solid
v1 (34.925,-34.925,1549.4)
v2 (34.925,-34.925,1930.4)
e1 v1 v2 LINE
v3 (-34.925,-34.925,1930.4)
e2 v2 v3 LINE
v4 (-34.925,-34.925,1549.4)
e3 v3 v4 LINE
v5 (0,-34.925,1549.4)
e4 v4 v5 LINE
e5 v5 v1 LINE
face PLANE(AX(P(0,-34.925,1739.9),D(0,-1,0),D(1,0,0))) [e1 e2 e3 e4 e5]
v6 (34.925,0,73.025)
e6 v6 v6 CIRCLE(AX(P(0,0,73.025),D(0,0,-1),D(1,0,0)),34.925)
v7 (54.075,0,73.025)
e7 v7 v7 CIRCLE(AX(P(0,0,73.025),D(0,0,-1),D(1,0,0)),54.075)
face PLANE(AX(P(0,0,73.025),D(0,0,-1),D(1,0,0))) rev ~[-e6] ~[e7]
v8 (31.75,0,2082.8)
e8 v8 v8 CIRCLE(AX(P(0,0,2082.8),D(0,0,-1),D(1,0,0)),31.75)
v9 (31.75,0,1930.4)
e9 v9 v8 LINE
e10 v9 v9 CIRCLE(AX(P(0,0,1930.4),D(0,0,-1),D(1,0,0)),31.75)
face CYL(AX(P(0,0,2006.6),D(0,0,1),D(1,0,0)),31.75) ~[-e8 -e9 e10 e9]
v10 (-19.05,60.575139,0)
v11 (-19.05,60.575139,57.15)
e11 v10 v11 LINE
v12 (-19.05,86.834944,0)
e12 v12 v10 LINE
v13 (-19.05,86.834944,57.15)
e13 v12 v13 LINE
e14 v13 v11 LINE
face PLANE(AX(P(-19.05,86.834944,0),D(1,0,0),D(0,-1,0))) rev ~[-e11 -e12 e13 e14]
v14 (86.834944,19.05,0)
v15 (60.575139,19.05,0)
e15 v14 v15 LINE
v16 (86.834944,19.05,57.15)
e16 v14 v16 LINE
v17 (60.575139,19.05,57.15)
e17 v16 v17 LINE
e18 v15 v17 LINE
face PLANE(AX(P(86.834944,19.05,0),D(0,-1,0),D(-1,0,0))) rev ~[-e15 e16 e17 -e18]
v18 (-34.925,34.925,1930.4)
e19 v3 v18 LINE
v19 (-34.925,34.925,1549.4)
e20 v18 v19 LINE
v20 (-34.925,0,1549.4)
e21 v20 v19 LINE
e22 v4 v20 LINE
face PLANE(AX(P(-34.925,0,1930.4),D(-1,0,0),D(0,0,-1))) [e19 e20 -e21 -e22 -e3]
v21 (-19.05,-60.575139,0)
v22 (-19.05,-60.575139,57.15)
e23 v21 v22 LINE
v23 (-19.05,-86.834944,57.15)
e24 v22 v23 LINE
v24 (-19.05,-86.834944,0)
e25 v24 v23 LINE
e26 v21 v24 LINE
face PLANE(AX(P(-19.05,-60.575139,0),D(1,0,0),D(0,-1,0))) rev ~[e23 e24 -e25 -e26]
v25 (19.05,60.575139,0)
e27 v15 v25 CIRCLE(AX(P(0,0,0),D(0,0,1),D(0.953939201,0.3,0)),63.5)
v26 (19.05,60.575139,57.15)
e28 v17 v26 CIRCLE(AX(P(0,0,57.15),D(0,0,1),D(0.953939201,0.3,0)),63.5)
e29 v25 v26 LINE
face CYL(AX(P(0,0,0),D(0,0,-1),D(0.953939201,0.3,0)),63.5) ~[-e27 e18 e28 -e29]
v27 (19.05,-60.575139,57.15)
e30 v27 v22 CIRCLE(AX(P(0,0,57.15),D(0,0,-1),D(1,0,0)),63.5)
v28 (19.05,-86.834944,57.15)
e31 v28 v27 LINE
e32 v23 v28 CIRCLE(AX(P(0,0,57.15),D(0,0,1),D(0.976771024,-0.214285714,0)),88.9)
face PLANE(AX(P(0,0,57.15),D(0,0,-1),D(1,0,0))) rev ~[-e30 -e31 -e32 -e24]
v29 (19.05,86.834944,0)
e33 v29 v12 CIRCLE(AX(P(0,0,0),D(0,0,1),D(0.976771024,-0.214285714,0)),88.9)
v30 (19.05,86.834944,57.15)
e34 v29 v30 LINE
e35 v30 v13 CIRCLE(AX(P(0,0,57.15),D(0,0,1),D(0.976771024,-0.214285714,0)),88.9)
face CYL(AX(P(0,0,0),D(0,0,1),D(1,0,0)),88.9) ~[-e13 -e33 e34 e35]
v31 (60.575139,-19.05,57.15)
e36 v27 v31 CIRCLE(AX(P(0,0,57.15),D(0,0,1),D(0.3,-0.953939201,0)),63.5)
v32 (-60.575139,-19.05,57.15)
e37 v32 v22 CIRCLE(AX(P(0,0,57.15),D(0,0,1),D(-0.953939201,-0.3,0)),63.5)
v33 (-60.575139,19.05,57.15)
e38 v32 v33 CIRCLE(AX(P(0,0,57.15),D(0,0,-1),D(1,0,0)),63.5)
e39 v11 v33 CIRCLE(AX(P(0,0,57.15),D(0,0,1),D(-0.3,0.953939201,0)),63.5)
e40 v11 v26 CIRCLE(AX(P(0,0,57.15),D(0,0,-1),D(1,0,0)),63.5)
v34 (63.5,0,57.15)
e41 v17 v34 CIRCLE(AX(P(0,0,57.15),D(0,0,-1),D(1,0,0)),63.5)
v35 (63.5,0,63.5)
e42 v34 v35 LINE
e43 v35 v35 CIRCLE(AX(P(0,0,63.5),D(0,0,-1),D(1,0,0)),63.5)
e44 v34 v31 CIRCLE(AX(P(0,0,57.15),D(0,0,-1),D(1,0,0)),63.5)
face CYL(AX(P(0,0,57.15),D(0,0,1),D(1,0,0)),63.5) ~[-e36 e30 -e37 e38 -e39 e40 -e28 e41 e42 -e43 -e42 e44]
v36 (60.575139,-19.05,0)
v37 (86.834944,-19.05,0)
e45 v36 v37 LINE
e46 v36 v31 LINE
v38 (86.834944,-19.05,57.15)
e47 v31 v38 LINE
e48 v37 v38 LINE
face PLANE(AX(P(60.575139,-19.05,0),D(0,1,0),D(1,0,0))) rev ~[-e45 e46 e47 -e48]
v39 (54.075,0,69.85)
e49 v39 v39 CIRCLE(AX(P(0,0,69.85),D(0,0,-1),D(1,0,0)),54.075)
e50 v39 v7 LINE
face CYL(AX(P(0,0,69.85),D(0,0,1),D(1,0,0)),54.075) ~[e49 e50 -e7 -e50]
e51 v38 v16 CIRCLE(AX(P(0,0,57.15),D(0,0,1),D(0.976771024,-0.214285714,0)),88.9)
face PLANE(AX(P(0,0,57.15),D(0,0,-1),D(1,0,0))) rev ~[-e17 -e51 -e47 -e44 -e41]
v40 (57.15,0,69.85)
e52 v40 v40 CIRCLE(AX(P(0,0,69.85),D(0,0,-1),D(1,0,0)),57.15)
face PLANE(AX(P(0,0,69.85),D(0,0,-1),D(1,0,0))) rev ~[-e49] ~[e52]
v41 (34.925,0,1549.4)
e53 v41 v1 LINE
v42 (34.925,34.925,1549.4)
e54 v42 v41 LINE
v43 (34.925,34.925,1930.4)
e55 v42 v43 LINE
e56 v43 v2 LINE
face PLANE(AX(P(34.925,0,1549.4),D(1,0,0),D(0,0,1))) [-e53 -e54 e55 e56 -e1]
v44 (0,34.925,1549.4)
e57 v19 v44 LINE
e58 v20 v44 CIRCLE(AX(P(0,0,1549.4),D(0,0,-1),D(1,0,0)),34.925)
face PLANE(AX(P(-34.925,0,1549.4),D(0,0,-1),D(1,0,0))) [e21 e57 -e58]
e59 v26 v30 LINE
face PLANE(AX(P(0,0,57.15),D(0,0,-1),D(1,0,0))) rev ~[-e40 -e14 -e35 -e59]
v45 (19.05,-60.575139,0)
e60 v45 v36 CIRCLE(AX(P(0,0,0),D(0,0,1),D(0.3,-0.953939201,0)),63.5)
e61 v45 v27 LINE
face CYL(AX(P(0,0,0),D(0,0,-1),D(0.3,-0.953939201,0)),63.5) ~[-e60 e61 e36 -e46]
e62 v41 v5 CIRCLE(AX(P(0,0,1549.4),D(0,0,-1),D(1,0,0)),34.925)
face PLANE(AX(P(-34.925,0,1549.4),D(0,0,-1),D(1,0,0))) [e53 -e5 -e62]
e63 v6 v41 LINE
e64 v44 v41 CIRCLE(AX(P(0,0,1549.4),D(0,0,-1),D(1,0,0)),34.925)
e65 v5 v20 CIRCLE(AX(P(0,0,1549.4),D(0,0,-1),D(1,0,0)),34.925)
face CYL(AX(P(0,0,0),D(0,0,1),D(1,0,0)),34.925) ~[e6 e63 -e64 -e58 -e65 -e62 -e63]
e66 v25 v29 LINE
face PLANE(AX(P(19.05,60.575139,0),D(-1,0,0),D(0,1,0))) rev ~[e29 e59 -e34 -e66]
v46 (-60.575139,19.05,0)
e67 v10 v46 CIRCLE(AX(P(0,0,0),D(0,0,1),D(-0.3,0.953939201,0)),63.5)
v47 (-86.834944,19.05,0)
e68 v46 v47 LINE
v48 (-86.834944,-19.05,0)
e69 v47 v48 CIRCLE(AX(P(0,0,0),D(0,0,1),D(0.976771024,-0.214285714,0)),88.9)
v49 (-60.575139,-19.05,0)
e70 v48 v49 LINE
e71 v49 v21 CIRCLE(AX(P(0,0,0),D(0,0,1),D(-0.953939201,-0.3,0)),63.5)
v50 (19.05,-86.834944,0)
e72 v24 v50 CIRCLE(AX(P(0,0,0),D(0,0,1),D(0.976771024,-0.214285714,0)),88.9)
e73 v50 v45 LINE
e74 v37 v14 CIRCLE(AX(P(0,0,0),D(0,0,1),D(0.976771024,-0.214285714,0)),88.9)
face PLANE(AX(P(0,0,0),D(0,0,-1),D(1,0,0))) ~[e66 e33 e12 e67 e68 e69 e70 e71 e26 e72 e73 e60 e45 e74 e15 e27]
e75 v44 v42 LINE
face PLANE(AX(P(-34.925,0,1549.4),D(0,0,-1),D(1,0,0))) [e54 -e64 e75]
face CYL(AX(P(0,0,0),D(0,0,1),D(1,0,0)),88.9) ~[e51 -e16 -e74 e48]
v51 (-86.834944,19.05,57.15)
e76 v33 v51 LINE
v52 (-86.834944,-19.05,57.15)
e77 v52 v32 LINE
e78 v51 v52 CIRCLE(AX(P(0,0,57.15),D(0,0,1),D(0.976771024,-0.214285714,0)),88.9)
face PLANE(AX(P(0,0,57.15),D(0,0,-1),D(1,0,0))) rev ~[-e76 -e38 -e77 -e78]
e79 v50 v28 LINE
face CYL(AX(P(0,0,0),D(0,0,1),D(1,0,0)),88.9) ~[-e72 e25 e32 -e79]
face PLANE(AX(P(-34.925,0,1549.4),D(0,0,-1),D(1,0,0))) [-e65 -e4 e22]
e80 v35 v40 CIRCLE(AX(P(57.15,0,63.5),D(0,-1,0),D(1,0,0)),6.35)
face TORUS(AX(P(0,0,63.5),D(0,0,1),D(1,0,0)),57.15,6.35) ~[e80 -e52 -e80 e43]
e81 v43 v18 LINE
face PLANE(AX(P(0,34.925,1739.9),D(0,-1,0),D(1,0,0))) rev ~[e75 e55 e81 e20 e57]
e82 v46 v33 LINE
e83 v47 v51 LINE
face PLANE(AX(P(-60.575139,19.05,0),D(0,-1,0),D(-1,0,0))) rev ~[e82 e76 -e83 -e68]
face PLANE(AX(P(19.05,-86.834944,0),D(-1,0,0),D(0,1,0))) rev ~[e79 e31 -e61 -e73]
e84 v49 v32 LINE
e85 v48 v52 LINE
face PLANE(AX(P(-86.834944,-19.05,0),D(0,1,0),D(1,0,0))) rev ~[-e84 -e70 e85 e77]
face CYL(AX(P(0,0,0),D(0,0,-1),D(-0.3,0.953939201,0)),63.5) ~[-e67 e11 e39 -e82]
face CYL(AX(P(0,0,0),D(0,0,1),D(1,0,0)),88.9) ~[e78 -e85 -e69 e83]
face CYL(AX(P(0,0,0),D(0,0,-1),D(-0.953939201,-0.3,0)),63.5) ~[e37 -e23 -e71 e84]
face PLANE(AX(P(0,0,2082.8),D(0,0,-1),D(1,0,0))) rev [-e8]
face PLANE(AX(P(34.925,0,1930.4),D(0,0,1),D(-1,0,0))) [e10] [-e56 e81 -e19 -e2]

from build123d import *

# Parameters (mm, degrees)
F3_DEPTH        = 34.925
F0_W            = 31.75
F0_H            = 152.4
F7_DEPTH        = 57.15
F7_COPIES_COUNT = 4


# Not quite as in the source:
# - a feature of the source that left no trace in its solid (it failed there, or was rolled back) is left out
# - a pattern or mirror of a feature is missing from the dataset's text; its kind, count and spacing are read off the source's solid


with BuildPart() as f1:
    # F0 (on Front) → F1 (revolve)
    with BuildSketch(Plane.XZ):
        with BuildLine():
            Line((34.925, 73.025), (34.925, 0))
            Line((34.925, 0), (88.9, 0))
            Line((88.9, 0), (88.9, 57.15))
            Line((88.9, 57.15), (63.5, 57.15))
            Line((63.5, 57.15), (63.5, 63.5))
            ThreePointArc((63.5, 63.5), (61.6401280605, 67.9901280605), (57.15, 69.85))
            Line((57.15, 69.85), (54.075, 69.85))
            Line((54.075, 69.85), (54.075, 73.025))
            Line((54.075, 73.025), (34.925, 73.025))
        make_face()
    revolve(axis=Axis((0, 0, -7.5624885379), (0, 0, -1)))

    # F0 (on Front) → F2 (revolve)
    with BuildSketch(Plane.XZ):
        Polygon((0, 1549.4), (0, 0), (34.925, 0), (34.925, 73.025), (34.925, 1549.4), align=None)
    revolve(axis=Axis((0, 0, -7.5624885379), (0, 0, -1)))

    # F0 (on Front) → F3 (join, symmetric)
    with BuildSketch(Plane.XZ):
        Polygon((-34.925, 1549.4), (0, 1549.4), (34.925, 1549.4), (34.925, 1930.4), (31.75, 1930.4), (0, 1930.4), (-34.925, 1930.4), align=None)
    extrude(amount=F3_DEPTH, both=True)

    # F0 (on Front) → F4 (revolve)
    with BuildSketch(Plane.XZ):
        with Locations((15.875, 2006.6)):
            Rectangle(F0_W, F0_H)
    revolve(axis=Axis((0, 0, -7.5624885379), (0, 0, -1)))

    # F6 (on face) → F7 (cut, through all)
    with BuildSketch(Plane(origin=(0, 0, 0), x_dir=(1, 0, 0), z_dir=(0, 0, -1))):
        with BuildLine():
            ThreePointArc((19.05, 60.57513929), (44.9012806053, 44.9012806053), (60.57513929, 19.05))
            Line((60.57513929, 19.05), (86.834944003, 19.05))
            ThreePointArc((86.834944003, 19.05), (62.8617928475, 62.8617928475), (19.05, 86.834944003))
            Line((19.05, 86.834944003), (19.05, 60.57513929))
        make_face()
    f7 = extrude(amount=-F7_DEPTH, mode=Mode.SUBTRACT)

    # F7_copies: F7 ×4 about axis
    f7_copies_axis = Axis((0, 0, 0), (0, 0, 1))
    for i in range(1, F7_COPIES_COUNT):
        add(f7.rotate(f7_copies_axis, i * 360 / F7_COPIES_COUNT), mode=Mode.SUBTRACT)


solid = f1.part
